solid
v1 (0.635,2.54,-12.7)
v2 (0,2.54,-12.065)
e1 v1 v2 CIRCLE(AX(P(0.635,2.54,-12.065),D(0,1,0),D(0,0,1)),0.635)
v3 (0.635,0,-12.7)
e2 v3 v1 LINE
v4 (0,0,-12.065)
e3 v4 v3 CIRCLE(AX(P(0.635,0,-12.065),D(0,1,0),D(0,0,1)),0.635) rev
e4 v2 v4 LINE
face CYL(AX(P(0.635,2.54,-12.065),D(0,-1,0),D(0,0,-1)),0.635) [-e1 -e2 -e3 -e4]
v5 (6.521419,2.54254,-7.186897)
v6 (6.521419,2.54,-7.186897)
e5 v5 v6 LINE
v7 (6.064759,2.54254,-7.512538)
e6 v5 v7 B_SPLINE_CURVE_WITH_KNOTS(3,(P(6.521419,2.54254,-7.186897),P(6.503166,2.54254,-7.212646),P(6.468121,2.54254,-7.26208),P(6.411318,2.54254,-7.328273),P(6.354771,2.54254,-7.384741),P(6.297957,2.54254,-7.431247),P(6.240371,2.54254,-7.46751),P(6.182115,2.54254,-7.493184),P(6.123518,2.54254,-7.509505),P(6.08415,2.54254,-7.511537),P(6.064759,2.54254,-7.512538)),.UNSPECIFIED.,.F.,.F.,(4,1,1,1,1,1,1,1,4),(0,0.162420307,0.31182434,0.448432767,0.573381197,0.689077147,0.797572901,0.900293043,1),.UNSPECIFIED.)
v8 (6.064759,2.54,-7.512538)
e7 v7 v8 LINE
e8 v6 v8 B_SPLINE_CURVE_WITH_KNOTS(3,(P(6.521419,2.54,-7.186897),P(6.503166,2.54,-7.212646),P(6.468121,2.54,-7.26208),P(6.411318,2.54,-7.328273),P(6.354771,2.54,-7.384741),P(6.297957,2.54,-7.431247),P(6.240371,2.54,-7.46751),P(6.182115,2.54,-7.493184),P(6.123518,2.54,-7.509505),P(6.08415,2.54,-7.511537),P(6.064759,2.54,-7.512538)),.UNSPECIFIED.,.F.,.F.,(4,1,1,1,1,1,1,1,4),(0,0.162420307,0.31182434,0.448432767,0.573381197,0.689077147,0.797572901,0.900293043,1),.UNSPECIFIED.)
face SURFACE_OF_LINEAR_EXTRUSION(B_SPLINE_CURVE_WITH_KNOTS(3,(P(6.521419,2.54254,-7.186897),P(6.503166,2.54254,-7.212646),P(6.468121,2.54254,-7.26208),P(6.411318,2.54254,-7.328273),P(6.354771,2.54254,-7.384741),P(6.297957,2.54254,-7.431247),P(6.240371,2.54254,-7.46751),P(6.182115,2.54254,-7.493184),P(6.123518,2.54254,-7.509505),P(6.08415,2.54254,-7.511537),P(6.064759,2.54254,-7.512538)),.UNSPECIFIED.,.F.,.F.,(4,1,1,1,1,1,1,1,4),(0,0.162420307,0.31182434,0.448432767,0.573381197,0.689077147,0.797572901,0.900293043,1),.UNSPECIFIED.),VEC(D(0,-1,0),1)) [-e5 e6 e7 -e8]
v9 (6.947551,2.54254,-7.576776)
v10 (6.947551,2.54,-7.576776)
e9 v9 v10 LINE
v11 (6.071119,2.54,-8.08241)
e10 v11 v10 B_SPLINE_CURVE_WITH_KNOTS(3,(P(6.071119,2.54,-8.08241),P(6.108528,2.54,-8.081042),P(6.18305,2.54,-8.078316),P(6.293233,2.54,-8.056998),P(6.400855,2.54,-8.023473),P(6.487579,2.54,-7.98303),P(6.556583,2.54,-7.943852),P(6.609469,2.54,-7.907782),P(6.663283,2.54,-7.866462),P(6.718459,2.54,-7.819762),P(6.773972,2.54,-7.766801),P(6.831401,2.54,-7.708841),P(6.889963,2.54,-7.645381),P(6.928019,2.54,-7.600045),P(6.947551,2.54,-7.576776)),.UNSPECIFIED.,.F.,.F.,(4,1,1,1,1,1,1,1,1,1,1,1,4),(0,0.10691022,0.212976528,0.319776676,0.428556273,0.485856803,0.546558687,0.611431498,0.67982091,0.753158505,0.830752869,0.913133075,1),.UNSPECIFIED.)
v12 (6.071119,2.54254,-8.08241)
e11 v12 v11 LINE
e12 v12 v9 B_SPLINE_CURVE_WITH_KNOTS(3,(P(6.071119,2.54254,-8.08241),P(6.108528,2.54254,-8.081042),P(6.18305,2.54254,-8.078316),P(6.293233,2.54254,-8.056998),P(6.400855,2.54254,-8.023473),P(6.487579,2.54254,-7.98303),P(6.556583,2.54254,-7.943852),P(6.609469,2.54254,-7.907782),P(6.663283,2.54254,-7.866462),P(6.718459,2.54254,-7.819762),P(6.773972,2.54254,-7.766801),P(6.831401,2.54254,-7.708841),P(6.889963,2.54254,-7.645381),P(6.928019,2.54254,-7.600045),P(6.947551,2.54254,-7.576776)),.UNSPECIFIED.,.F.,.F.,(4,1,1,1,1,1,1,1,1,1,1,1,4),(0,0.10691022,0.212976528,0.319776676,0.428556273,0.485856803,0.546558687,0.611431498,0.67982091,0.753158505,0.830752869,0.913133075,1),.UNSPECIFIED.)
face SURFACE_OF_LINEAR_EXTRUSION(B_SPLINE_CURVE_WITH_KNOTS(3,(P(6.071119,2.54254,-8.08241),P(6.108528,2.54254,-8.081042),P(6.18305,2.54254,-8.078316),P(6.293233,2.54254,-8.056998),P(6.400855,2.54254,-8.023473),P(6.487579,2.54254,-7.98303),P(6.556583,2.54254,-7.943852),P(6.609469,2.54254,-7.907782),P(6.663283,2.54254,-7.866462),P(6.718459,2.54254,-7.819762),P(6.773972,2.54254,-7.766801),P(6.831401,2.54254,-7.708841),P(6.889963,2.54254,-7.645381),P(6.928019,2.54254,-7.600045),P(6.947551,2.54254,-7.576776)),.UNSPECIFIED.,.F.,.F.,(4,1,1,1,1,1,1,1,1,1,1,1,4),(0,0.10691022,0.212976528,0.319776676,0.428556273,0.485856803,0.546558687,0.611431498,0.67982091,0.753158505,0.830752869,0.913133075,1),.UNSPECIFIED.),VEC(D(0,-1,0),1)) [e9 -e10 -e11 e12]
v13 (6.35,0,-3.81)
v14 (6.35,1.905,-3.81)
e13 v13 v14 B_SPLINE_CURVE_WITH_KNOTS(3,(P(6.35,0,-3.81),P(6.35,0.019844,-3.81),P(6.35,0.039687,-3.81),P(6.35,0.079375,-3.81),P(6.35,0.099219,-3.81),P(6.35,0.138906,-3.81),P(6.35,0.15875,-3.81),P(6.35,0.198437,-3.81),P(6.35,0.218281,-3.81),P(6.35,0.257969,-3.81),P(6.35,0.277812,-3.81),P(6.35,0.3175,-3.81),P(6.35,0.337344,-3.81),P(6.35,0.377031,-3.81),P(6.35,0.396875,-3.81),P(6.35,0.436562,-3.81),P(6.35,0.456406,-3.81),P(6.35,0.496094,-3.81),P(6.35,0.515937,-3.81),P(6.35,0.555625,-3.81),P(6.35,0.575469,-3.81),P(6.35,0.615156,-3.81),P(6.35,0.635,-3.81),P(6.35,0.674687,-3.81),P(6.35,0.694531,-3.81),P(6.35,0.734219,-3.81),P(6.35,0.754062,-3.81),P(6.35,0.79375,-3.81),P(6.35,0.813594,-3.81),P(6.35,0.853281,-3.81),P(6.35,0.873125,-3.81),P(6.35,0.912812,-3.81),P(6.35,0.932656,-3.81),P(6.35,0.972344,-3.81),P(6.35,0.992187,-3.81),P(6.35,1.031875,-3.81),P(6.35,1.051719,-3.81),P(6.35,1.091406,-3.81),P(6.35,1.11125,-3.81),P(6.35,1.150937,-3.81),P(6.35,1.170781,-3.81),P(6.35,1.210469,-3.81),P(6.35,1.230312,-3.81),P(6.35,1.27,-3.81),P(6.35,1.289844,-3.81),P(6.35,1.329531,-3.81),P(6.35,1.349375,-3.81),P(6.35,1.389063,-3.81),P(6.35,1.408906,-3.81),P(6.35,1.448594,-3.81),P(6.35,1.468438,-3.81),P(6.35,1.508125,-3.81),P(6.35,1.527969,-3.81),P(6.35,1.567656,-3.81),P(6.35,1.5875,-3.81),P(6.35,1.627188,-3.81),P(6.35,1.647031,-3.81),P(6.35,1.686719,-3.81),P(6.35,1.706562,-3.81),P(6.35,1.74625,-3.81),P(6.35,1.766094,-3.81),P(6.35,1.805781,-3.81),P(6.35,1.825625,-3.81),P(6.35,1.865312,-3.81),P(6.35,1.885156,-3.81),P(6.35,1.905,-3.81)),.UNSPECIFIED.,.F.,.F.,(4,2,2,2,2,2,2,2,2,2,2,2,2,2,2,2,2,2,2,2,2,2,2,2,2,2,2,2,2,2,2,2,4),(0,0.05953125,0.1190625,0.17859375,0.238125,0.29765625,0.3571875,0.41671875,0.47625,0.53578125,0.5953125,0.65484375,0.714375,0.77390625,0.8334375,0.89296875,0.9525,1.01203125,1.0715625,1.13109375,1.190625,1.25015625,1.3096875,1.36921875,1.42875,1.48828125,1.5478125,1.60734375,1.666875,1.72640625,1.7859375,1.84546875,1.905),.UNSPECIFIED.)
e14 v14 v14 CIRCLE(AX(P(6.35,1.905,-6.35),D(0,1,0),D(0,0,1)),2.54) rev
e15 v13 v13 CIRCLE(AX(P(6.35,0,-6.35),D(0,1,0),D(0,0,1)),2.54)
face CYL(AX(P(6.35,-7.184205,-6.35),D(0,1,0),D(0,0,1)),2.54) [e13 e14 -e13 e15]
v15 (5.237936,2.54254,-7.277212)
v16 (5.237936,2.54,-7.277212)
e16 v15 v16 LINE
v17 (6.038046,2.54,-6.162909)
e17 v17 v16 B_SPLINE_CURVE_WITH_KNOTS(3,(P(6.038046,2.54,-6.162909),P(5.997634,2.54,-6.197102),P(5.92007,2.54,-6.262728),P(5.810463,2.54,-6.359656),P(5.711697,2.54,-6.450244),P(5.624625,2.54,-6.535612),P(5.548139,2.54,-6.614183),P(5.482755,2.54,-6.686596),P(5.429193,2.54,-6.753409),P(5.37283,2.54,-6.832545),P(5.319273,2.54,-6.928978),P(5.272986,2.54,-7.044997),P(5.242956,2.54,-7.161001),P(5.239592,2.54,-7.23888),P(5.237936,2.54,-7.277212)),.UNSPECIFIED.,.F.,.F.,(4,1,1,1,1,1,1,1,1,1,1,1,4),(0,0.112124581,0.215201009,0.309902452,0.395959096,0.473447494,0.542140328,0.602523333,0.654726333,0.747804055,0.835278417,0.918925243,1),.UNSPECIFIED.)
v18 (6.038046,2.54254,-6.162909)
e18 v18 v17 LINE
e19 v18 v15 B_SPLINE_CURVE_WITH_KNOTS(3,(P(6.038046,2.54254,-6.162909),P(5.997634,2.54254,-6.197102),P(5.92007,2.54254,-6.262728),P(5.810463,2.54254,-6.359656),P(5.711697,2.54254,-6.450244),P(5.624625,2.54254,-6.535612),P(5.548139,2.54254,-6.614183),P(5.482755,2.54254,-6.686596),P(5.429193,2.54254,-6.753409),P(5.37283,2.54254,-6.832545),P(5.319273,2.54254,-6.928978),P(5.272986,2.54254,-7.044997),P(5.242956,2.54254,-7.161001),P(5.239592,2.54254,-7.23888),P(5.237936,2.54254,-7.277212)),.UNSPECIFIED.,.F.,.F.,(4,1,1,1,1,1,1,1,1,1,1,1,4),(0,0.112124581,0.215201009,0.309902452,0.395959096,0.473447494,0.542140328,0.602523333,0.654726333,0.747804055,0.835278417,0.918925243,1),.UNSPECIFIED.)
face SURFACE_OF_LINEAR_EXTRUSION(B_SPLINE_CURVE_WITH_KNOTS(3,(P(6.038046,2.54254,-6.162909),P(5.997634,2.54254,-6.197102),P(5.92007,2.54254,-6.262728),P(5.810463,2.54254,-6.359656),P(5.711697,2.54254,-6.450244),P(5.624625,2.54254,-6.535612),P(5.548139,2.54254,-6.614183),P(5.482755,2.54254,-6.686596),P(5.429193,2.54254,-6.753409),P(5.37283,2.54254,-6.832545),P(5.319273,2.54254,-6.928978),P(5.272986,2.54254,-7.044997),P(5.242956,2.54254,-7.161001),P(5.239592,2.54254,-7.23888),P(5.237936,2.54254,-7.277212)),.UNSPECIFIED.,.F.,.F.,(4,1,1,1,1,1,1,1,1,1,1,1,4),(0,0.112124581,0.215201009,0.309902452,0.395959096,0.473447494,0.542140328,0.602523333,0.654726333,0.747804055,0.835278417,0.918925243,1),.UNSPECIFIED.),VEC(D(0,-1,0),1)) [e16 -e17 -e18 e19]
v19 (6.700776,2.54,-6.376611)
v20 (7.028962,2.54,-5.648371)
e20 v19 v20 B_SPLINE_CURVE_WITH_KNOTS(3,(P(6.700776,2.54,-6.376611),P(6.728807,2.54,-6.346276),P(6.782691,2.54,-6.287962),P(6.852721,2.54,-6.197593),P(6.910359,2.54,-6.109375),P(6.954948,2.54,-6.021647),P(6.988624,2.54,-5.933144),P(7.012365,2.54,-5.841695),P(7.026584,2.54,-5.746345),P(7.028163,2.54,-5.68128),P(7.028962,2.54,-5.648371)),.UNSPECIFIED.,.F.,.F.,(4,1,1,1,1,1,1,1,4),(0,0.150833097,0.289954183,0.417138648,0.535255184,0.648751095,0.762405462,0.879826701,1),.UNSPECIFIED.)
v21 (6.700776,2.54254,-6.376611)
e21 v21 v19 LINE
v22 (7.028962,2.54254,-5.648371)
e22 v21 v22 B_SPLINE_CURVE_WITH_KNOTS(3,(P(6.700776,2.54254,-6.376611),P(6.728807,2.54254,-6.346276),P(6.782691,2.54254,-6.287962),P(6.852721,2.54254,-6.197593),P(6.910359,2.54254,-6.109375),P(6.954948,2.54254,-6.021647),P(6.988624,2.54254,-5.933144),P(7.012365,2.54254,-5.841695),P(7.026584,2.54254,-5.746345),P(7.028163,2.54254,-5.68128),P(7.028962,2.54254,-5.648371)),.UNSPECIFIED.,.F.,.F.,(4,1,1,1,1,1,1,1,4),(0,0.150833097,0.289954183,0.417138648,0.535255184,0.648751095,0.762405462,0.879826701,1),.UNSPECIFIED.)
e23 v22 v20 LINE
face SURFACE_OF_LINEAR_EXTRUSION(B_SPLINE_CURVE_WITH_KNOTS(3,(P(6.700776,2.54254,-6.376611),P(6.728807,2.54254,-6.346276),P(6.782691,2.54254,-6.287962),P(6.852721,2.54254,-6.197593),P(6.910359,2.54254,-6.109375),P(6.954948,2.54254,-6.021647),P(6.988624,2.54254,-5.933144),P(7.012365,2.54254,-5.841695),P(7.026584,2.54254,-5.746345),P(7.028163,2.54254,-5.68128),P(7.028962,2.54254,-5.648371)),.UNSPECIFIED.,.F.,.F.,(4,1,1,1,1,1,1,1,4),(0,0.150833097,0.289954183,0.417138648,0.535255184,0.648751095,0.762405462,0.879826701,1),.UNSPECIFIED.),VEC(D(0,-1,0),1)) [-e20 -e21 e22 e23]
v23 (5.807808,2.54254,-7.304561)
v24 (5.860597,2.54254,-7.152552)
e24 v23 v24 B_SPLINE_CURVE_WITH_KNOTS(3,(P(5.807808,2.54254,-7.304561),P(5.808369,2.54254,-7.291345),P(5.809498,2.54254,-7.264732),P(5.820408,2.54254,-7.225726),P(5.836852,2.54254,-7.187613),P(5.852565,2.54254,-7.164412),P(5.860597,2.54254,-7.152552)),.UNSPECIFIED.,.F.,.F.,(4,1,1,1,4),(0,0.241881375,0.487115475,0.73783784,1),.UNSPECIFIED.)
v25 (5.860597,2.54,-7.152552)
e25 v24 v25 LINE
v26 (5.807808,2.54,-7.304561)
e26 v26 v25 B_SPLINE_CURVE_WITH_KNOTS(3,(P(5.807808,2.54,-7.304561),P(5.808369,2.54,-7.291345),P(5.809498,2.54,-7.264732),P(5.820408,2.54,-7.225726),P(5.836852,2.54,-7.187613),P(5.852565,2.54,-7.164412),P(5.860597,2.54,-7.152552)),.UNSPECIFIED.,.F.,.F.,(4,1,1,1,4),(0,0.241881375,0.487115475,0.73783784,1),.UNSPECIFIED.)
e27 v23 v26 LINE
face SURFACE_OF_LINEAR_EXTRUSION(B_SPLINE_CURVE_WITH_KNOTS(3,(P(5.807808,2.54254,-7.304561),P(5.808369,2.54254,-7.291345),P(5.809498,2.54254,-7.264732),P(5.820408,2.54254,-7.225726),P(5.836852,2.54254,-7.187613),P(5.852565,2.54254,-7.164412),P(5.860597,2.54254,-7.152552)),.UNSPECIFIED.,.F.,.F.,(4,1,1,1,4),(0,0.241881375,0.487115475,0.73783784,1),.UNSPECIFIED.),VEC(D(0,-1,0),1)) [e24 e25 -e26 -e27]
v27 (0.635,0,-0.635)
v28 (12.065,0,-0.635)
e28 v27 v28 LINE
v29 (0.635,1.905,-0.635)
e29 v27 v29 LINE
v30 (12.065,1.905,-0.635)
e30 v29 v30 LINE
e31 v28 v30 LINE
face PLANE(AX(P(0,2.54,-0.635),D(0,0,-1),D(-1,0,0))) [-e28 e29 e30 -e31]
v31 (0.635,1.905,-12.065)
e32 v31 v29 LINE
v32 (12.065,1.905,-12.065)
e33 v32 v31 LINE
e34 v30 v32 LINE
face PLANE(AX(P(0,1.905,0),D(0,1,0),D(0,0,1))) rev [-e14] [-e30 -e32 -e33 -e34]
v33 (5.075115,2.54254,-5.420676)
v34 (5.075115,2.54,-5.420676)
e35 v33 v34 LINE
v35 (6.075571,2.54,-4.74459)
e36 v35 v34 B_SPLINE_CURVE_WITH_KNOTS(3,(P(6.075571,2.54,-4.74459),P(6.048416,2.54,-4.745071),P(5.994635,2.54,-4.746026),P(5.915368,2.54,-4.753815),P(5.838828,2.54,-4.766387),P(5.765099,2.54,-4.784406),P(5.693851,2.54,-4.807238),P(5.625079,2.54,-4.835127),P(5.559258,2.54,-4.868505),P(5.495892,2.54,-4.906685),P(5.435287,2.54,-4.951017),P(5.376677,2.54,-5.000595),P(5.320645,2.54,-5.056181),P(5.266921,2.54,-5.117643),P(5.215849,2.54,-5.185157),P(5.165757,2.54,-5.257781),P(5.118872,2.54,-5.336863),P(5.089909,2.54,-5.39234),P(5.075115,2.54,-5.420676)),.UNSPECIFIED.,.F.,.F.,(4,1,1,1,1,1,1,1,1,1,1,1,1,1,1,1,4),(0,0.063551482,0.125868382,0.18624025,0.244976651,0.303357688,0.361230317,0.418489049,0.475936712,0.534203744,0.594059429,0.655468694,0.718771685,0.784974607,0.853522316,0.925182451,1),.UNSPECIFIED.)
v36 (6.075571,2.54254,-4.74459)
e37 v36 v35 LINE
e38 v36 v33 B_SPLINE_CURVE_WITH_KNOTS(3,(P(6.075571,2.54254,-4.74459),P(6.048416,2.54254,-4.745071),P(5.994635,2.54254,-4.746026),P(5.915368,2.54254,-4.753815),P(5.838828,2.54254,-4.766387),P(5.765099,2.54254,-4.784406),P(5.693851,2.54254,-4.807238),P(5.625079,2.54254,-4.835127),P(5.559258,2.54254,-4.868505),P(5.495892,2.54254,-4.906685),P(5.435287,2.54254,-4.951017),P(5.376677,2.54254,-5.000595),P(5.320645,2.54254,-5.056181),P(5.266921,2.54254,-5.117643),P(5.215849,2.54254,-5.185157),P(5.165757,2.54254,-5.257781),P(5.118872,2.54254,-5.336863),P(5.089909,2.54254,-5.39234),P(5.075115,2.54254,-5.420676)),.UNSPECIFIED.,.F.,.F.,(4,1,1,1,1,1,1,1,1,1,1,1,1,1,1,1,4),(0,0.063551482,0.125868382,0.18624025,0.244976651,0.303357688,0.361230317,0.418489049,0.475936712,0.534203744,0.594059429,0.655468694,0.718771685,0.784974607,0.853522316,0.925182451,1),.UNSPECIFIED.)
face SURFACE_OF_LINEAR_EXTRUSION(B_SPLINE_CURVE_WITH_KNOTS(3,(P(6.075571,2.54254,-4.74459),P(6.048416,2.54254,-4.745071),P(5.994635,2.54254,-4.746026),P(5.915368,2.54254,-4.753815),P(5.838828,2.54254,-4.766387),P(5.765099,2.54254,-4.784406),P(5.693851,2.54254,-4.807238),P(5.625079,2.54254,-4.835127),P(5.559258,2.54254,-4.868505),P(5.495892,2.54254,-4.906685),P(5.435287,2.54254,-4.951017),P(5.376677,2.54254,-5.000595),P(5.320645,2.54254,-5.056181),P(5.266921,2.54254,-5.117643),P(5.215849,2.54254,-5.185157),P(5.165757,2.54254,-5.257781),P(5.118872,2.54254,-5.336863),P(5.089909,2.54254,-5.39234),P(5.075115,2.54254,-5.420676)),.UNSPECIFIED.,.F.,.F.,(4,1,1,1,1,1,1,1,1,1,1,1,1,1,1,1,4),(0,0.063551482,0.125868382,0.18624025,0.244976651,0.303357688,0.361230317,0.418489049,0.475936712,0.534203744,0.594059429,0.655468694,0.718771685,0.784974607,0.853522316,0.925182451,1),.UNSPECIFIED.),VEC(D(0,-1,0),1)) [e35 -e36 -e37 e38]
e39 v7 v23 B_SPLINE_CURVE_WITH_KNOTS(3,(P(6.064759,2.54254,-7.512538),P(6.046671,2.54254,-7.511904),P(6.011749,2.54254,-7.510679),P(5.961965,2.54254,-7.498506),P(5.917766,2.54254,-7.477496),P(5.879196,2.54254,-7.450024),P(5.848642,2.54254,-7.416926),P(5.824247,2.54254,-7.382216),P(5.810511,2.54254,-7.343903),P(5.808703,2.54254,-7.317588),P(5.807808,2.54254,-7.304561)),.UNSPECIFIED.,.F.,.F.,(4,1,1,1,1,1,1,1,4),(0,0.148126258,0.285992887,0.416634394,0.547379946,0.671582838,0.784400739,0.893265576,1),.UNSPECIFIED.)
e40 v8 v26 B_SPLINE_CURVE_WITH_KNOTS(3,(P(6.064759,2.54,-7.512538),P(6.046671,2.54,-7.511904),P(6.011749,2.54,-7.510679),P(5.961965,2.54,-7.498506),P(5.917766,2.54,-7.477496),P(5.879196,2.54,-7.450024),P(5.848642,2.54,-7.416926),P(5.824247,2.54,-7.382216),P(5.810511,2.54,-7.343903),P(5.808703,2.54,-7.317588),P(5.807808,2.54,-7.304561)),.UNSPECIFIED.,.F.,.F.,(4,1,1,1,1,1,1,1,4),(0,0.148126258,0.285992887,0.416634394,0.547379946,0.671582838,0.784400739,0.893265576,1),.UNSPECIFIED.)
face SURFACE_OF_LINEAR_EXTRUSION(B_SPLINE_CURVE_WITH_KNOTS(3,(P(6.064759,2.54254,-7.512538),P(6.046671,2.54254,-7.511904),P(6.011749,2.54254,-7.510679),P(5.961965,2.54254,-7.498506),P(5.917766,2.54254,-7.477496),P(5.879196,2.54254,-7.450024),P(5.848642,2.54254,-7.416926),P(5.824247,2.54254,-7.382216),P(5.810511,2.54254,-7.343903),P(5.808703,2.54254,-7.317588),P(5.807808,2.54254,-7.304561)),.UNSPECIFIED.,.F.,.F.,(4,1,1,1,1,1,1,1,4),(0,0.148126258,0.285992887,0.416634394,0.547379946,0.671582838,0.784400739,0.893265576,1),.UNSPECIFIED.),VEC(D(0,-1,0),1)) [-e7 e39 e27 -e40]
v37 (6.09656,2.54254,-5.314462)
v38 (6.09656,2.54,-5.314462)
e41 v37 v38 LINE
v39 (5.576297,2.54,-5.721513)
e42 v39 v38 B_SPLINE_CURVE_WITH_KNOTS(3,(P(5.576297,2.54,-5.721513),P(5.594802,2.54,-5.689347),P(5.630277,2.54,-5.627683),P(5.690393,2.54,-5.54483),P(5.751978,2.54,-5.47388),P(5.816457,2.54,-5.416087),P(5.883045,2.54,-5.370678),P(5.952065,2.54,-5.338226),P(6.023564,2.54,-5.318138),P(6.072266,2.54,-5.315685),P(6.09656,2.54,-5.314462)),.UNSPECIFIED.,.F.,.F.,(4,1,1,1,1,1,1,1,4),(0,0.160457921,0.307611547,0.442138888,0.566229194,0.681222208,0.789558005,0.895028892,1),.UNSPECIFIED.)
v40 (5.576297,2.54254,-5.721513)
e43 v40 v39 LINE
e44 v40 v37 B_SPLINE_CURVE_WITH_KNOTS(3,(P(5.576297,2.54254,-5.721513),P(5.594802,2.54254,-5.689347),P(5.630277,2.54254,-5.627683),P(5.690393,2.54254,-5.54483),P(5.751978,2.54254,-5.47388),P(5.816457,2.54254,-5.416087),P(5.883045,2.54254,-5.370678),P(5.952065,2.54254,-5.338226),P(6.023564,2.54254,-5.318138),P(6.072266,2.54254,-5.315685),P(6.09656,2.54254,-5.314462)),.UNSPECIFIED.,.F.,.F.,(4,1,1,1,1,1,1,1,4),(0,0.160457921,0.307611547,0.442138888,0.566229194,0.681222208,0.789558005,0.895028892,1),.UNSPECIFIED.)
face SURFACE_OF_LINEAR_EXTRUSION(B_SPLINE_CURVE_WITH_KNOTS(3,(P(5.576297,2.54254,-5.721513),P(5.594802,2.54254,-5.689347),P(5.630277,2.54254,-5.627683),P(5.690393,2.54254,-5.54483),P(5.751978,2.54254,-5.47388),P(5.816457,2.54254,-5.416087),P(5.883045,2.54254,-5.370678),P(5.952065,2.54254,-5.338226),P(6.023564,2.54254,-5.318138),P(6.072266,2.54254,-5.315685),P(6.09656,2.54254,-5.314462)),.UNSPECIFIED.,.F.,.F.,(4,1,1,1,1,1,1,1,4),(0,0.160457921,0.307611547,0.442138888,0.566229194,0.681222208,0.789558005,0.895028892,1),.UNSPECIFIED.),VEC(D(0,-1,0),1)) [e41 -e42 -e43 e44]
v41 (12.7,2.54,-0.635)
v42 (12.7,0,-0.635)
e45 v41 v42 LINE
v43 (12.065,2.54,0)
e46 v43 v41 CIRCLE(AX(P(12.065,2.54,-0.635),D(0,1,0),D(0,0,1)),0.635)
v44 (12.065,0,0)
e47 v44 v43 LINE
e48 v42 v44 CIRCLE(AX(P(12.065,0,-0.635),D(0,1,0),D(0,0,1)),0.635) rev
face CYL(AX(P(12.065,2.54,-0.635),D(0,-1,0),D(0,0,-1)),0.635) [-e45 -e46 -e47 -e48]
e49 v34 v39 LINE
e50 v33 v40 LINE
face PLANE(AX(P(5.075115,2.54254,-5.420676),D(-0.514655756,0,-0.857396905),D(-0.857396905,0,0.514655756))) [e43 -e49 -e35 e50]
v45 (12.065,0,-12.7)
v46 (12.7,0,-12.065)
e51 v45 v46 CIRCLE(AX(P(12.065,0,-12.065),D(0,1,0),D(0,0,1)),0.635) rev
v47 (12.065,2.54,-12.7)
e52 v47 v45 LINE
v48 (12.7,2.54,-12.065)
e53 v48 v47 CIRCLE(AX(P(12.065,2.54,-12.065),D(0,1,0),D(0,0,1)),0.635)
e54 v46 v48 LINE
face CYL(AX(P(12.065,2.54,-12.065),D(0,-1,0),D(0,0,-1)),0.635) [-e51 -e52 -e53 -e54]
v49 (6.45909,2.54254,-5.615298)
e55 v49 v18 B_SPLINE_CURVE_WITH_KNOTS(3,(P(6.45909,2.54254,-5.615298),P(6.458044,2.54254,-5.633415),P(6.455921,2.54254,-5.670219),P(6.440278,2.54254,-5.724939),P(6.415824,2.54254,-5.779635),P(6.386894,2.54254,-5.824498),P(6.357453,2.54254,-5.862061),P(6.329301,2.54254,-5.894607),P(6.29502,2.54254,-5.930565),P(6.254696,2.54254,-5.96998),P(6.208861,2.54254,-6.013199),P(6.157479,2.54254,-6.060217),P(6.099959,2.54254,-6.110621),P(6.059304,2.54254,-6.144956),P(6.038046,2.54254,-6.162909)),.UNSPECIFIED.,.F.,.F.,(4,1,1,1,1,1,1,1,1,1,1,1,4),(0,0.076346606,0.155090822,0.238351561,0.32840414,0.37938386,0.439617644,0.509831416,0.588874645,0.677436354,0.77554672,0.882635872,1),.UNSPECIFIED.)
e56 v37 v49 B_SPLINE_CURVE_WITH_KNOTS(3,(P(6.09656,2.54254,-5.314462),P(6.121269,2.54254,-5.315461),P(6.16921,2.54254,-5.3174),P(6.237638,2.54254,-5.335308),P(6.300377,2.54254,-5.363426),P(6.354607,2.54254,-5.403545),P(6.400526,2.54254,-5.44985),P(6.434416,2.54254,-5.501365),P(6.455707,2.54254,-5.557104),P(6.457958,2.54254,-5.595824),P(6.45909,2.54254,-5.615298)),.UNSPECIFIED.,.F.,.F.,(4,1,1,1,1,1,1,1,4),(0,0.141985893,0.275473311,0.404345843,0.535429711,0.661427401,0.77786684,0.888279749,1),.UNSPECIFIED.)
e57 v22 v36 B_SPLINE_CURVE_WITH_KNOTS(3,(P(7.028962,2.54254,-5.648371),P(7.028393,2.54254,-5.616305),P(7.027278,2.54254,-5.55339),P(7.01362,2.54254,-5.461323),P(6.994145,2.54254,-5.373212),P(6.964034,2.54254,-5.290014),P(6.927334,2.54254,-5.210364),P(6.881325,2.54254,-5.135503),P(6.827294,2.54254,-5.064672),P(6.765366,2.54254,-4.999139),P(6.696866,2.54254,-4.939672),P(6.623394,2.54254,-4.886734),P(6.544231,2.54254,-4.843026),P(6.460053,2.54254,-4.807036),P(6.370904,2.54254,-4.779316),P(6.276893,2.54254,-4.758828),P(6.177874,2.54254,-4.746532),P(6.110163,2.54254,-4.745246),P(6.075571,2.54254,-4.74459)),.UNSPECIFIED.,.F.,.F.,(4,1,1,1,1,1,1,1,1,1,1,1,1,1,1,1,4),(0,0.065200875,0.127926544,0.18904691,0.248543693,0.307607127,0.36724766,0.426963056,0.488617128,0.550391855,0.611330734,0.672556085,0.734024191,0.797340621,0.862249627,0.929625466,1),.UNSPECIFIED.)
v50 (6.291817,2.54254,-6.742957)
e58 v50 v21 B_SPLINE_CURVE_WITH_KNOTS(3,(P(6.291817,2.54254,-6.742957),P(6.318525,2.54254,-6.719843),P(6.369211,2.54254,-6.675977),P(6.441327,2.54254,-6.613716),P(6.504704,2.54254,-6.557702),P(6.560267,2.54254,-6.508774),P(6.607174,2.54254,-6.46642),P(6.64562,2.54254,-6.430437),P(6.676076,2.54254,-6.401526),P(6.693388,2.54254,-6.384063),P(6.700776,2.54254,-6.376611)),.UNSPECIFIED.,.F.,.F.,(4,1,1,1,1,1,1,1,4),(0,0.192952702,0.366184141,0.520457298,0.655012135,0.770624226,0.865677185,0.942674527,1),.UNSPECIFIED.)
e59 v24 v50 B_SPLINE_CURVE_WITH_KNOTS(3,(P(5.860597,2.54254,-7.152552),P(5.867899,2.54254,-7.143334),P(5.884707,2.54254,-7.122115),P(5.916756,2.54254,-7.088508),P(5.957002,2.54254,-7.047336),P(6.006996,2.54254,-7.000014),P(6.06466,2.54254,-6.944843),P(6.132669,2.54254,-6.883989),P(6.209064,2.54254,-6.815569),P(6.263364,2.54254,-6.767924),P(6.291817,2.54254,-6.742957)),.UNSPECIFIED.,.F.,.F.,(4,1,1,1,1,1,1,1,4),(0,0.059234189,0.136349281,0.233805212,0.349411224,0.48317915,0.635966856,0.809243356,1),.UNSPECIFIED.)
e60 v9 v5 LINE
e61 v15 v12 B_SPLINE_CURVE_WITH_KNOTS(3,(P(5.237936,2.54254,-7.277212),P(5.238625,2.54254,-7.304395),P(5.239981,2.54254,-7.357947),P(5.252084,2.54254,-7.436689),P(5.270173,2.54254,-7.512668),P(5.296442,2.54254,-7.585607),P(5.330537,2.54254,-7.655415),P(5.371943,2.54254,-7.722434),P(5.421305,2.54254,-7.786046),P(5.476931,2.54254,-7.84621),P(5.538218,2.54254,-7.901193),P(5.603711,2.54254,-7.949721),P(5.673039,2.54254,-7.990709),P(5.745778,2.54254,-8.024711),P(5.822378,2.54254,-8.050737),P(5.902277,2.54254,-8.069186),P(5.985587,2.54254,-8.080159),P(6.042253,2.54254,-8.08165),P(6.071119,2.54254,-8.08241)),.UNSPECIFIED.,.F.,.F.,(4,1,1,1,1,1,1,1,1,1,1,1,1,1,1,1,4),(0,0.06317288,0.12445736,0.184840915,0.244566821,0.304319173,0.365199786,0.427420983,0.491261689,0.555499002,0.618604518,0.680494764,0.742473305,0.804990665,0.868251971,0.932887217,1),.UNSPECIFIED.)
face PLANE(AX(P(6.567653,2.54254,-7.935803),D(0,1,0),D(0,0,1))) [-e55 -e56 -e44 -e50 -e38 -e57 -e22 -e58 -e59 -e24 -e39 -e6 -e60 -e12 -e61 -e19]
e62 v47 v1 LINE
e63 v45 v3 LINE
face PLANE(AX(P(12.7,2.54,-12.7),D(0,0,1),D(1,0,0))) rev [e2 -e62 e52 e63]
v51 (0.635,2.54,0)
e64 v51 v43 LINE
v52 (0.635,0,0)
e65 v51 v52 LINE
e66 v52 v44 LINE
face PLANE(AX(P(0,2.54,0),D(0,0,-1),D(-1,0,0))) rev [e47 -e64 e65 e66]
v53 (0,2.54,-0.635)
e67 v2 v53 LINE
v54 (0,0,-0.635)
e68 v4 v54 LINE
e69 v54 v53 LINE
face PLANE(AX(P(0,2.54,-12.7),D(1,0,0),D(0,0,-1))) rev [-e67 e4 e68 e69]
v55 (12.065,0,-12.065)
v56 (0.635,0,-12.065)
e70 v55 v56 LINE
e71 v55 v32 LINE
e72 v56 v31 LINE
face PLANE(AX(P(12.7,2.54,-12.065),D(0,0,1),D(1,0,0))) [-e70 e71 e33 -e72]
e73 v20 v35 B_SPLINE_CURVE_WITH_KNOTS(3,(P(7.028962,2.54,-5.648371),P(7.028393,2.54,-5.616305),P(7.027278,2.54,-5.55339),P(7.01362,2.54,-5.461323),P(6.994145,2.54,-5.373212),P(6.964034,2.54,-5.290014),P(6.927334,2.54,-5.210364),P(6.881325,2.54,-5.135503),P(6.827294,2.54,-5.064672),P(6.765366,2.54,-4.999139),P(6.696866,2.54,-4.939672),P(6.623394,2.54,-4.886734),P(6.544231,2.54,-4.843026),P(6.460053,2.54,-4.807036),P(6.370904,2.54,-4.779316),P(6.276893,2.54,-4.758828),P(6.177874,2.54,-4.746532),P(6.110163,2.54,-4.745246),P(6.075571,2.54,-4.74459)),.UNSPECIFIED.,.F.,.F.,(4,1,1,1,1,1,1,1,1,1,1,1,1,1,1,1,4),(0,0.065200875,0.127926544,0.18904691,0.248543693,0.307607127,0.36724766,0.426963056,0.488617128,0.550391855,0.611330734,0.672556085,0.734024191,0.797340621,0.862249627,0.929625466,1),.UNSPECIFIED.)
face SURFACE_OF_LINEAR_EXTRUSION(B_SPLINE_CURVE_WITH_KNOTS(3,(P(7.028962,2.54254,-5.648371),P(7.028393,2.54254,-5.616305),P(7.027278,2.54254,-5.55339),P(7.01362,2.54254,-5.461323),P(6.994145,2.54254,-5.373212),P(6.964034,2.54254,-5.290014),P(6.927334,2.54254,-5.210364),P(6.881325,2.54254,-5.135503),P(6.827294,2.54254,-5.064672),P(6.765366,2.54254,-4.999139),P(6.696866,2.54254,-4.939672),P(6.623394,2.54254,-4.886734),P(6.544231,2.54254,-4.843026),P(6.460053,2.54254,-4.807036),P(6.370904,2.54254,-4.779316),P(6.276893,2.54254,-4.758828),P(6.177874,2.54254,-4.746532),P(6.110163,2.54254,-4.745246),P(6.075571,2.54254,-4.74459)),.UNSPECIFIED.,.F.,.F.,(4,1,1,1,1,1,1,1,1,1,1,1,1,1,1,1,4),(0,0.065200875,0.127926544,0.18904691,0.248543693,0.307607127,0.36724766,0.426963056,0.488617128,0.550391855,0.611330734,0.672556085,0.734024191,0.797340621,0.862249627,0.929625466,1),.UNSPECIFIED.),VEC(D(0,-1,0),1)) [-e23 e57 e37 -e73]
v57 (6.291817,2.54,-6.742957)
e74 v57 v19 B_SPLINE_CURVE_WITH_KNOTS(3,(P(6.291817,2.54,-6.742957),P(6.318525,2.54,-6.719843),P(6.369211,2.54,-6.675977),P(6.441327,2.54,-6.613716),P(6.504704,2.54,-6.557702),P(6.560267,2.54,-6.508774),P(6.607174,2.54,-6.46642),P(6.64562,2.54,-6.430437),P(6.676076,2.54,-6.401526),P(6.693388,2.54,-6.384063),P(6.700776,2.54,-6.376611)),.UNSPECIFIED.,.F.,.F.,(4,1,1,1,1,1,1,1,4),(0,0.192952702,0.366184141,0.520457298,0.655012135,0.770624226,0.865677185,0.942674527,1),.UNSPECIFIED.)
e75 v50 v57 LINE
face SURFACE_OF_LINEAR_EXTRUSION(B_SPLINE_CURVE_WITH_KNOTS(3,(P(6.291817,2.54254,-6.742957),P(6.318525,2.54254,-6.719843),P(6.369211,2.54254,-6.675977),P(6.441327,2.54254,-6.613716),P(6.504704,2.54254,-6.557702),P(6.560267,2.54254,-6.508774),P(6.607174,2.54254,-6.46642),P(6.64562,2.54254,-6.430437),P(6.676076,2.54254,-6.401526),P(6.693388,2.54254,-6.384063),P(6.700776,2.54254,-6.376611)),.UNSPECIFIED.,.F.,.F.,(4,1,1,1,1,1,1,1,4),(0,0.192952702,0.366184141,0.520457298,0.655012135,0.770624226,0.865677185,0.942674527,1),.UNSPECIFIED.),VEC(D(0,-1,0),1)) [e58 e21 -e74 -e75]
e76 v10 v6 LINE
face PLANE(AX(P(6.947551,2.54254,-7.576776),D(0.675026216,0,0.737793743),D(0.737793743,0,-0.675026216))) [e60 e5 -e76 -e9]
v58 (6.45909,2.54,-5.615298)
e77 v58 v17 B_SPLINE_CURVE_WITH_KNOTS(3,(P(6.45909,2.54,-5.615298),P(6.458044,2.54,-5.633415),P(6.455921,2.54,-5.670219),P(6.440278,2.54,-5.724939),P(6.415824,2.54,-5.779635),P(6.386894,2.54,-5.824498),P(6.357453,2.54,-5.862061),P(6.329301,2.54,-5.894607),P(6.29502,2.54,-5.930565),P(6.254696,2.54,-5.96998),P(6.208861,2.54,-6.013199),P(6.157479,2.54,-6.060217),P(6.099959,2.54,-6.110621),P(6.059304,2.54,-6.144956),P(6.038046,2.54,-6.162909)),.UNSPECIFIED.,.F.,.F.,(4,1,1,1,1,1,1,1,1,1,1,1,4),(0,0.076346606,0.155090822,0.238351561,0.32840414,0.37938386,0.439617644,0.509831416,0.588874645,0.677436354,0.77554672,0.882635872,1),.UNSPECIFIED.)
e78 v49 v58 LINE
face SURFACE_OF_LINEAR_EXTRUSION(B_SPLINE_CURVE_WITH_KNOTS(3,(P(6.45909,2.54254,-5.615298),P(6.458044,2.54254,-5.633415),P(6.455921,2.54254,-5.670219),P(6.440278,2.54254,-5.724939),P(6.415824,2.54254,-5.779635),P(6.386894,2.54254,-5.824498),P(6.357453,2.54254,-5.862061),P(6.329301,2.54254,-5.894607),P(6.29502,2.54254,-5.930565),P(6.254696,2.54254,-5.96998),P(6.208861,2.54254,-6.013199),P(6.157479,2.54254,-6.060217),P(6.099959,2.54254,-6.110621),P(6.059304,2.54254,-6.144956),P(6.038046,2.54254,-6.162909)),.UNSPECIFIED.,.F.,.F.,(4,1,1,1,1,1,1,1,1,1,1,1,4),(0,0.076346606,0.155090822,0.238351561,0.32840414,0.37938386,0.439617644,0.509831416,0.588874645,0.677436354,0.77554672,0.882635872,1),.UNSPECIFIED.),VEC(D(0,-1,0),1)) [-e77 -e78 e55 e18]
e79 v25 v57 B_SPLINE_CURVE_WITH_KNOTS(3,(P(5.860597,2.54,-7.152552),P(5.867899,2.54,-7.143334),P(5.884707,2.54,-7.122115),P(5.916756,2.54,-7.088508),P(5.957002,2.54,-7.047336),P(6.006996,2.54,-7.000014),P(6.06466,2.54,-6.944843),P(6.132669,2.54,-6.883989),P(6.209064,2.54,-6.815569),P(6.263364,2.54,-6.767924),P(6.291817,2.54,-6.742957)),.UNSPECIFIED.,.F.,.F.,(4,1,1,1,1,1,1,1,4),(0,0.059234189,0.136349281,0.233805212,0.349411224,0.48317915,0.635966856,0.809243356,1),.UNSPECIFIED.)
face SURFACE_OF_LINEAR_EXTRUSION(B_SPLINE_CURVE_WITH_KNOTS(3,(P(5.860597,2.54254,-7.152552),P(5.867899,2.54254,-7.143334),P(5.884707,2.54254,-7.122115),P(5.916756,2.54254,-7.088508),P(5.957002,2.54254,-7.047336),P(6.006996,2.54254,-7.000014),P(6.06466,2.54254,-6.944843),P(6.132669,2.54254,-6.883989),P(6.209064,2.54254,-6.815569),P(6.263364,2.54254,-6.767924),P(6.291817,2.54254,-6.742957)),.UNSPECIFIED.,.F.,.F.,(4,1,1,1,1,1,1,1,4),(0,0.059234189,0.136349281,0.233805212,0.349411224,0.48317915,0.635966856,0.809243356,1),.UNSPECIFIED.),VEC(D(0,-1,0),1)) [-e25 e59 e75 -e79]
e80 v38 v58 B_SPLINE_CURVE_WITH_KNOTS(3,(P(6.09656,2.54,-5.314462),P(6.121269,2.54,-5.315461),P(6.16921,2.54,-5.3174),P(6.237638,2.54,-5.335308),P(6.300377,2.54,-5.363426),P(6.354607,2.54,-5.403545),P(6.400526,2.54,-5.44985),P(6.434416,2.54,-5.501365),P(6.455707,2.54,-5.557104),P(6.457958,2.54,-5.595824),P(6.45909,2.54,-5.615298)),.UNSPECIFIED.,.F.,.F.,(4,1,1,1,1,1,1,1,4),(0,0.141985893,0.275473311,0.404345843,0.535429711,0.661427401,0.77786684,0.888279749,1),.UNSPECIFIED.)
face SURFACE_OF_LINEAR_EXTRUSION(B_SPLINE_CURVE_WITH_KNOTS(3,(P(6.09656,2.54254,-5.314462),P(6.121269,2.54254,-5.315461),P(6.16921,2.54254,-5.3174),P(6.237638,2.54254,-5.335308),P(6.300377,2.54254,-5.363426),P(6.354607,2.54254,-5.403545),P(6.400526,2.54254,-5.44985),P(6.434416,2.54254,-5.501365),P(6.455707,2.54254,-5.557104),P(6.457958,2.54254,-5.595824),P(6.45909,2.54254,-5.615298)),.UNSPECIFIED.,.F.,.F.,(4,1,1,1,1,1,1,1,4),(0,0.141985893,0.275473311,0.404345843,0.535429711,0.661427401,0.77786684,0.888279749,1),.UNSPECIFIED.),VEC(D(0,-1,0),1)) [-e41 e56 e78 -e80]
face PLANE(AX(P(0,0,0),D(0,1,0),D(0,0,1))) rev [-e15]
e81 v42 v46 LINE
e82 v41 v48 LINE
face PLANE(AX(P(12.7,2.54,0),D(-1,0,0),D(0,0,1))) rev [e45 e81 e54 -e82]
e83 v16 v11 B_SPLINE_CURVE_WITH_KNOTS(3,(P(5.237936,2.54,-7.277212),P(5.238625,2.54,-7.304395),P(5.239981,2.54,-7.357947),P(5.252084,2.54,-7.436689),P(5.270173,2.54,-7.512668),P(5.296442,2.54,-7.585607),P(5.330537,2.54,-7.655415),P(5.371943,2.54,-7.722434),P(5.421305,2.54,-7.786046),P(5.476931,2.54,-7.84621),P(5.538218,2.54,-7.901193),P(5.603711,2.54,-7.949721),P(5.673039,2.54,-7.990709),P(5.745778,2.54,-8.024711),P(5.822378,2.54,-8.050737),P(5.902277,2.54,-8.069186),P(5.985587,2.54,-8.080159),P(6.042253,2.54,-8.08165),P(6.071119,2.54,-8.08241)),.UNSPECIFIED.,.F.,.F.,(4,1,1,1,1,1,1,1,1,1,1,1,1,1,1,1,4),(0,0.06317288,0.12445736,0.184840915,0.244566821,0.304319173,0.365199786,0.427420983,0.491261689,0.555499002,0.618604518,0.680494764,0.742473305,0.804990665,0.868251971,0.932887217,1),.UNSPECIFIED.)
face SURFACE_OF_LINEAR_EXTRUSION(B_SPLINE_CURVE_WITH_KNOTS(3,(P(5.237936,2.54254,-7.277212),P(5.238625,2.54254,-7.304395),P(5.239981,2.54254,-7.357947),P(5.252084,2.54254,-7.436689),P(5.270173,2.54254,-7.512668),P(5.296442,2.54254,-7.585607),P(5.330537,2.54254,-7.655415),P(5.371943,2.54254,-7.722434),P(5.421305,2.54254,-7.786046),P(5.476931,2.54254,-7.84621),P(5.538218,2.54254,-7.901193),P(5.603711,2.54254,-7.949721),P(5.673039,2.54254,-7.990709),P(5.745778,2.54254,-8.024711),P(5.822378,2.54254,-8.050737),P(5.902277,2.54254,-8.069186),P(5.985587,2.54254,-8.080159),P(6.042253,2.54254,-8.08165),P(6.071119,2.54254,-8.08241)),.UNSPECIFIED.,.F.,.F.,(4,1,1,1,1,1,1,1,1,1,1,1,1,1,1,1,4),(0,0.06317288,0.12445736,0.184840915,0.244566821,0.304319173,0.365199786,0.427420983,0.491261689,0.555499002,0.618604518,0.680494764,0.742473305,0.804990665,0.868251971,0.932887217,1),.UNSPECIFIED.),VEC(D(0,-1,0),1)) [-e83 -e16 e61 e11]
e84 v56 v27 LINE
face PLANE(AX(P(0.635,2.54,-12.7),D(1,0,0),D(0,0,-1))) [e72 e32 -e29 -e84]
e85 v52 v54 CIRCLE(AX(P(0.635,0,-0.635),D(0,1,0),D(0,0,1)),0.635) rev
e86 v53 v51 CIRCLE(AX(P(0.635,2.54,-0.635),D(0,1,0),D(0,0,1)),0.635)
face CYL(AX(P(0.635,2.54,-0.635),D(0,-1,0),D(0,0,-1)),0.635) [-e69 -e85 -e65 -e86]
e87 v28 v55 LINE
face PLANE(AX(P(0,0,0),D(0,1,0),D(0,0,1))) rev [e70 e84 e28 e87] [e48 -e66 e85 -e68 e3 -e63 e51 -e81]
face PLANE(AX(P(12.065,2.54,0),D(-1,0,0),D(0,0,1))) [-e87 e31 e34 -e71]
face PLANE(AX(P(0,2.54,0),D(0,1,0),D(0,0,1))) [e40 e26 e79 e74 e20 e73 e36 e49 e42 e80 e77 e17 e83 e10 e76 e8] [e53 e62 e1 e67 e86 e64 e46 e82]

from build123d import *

# Parameters (mm, degrees)
SKETCH1_W           = 12.7
SKETCH1_H           = 12.7
BOSS_EXTRUDE1_DEPTH = 2.54
FILLET1_R           = 0.635
SHELL1_START        = 0.635
SHELL1_OUTLINE_W    = 1.905
SHELL1_OUTLINE_H    = 11.43
SHELL1_DEPTH        = 11.43
SKETCH2_R           = 2.54
BOSS_EXTRUDE2_DEPTH = 1.905
BOSS_EXTRUDE3_DEPTH = 0.00254


# Read off the part's stored shape, not the designer's step: Shell1
with BuildPart() as part:
    # Sketch1 → Boss-Extrude1 (new body)
    with BuildSketch(Plane(origin=(0, 0, 0), x_dir=(1, 0, 0), z_dir=(0, 1, 0))):
        with Locations((6.35, 6.35)):
            Rectangle(SKETCH1_W, SKETCH1_H)
    extrude(amount=BOSS_EXTRUDE1_DEPTH)

    # Fillet1
    fillet1_edges = [part.edges().sort_by_distance(p)[0] for p in [
        (0, 1.27, -12.7),
        (12.7, 1.27, -12.7),
        (12.7, 1.27, 0),
        (0, 1.27, 0),
    ]]
    fillet(fillet1_edges, radius=FILLET1_R)

    # Shell1 outline → Shell1 (cut)
    with BuildSketch(Plane.YZ.offset(SHELL1_START)):
        with Locations((0.9525, -6.35)):
            Rectangle(SHELL1_OUTLINE_W, SHELL1_OUTLINE_H)
    extrude(amount=SHELL1_DEPTH, mode=Mode.SUBTRACT)

    # Sketch2 → Boss-Extrude2 (add)
    with BuildSketch(Plane(origin=(0, 1.905, 0), x_dir=(-1, 0, 0), z_dir=(0, -1, 0))):
        with Locations(Location((-6.35, 6.35, 0), (0, 0, 270))):
            Circle(SKETCH2_R)
    extrude(amount=BOSS_EXTRUDE2_DEPTH)

    # Sketch3 → Boss-Extrude3 (add)
    with BuildSketch(Plane(origin=(0, 2.54, 0), x_dir=(1, 0, 0), z_dir=(0, 1, 0))):
        with BuildLine():
            Line((6.947551282, 7.576776242), (6.521419471, 7.186897436))
            add(Edge.make_bspline(
                [(6.521419471, 7.186897436), (6.503165812, 7.21264612), (6.468121331, 7.262080004), (6.411317883, 7.328273139), (6.354770931, 7.384740809), (6.297956603, 7.431247119), (6.240371318, 7.467509507), (6.182115036, 7.493183679), (6.123518028, 7.509504993), (6.084149883, 7.51153739), (6.064758814, 7.512538462)],
                knots=[0, 0, 0, 0, 1.299362458, 2.494594718, 3.587462134, 4.587049575, 5.512617175, 6.380583204, 7.202344345, 8, 8, 8, 8], degree=3))
            add(Edge.make_bspline(
                [(6.064758814, 7.512538462), (6.046671381, 7.511904137), (6.0117493, 7.510679422), (5.961965283, 7.498505847), (5.917766323, 7.477496044), (5.879195557, 7.45002396), (5.84864182, 7.416926467), (5.82424703, 7.382215707), (5.810510714, 7.343902879), (5.808702744, 7.317588082), (5.807807692, 7.304560697)],
                knots=[0, 0, 0, 0, 1.185010067, 2.2879431, 3.333075148, 4.379039566, 5.372662701, 6.27520591, 7.14612461, 8, 8, 8, 8], degree=3))
            add(Edge.make_bspline(
                [(5.807807692, 7.304560697), (5.808368576, 7.291345451), (5.809498118, 7.264731783), (5.820407957, 7.225726137), (5.836852199, 7.18761308), (5.852565344, 7.164411849), (5.860597155, 7.152552484)],
                knots=[0, 0, 0, 0, 0.967525499, 1.948461899, 2.951351359, 4, 4, 4, 4], degree=3))
            add(Edge.make_bspline(
                [(5.860597155, 7.152552484), (5.867898941, 7.143334324), (5.884706688, 7.122115336), (5.916755618, 7.088507766), (5.957002343, 7.047335552), (6.006995642, 7.000014485), (6.064660156, 6.944842714), (6.132668709, 6.883989063), (6.209063719, 6.815568965), (6.263363522, 6.767923686), (6.291817107, 6.742957131)],
                knots=[0, 0, 0, 0, 0.473873513, 1.090794244, 1.870441696, 2.795289791, 3.865433203, 5.087734844, 6.473946851, 8, 8, 8, 8], degree=3))
            add(Edge.make_bspline(
                [(6.291817107, 6.742957131), (6.31852489, 6.719842892), (6.369210714, 6.675976869), (6.441326575, 6.613716092), (6.504704406, 6.557701589), (6.560267478, 6.508774018), (6.607173508, 6.466420016), (6.645619689, 6.430437133), (6.676075577, 6.401525888), (6.693387966, 6.384063478), (6.700776442, 6.376610978)],
                knots=[0, 0, 0, 0, 1.543621617, 2.929473131, 4.163658386, 5.240097082, 6.164993805, 6.925417477, 7.541396219, 8, 8, 8, 8], degree=3))
            add(Edge.make_bspline(
                [(6.700776442, 6.376610978), (6.72880678, 6.346276149), (6.782690932, 6.287961956), (6.852721334, 6.197593297), (6.910358621, 6.109375058), (6.954947919, 6.021647272), (6.98862355, 5.9331442), (7.012365316, 5.84169531), (7.026584417, 5.746345018), (7.02816307, 5.681280084), (7.028961538, 5.648370793)],
                knots=[0, 0, 0, 0, 1.206664779, 2.319633467, 3.337109185, 4.282041471, 5.190008762, 6.099243693, 7.03861361, 8, 8, 8, 8], degree=3))
            add(Edge.make_bspline(
                [(7.028961538, 5.648370793), (7.028393209, 5.616304725), (7.027278125, 5.553389906), (7.013620483, 5.46132344), (6.994145488, 5.373211837), (6.96403373, 5.290013874), (6.927333696, 5.210363884), (6.881324904, 5.135502559), (6.827293886, 5.064672272), (6.765366044, 4.999139201), (6.696866497, 4.939672482), (6.623394222, 4.886733804), (6.544230772, 4.843026182), (6.460052505, 4.807036073), (6.370904481, 4.77931601), (6.276892901, 4.7588283), (6.17787397, 4.746531899), (6.110163397, 4.745246456), (6.075571114, 4.744589744)],
                knots=[0, 0, 0, 0, 1.043214005, 2.046824704, 3.02475056, 3.976699089, 4.921714032, 5.875962561, 6.831408892, 7.817874052, 8.806269674, 9.781291748, 10.760897367, 11.74438705, 12.757449933, 13.795994037, 14.874007457, 16, 16, 16, 16], degree=3))
            add(Edge.make_bspline(
                [(6.075571114, 4.744589744), (6.048416466, 4.745071485), (5.994634689, 4.74602561), (5.915368481, 4.753815242), (5.838827997, 4.766386881), (5.765099453, 4.784405794), (5.693850688, 4.807238201), (5.625078777, 4.835127112), (5.559258474, 4.868504794), (5.495891752, 4.906684869), (5.435286652, 4.951016965), (5.376676846, 5.000594728), (5.320644503, 5.056180684), (5.266920509, 5.117643377), (5.215848607, 5.185156853), (5.165757029, 5.257780861), (5.118871997, 5.336863206), (5.089909027, 5.392340111), (5.075115385, 5.420676482)],
                knots=[0, 0, 0, 0, 1.016823716, 2.013894106, 2.979844003, 3.91962641, 4.853723003, 5.779685073, 6.695824784, 7.614987388, 8.547259901, 9.504950863, 10.487499108, 11.500346958, 12.559593716, 13.656357062, 14.802919212, 16, 16, 16, 16], degree=3))
            Line((5.075115385, 5.420676482), (5.576297276, 5.721512821))
            add(Edge.make_bspline(
                [(5.576297276, 5.721512821), (5.594801911, 5.689347337), (5.630276879, 5.627683355), (5.690392527, 5.54482998), (5.751977941, 5.473879779), (5.816456918, 5.416086802), (5.883045419, 5.370678281), (5.952065082, 5.338226202), (6.023564398, 5.318138402), (6.072266484, 5.315685218), (6.096559696, 5.314461538)],
                knots=[0, 0, 0, 0, 1.283663364, 2.460892379, 3.537111102, 4.529833553, 5.449777664, 6.316464042, 7.160231139, 8, 8, 8, 8], degree=3))
            add(Edge.make_bspline(
                [(6.096559696, 5.314461538), (6.12126937, 5.315460861), (6.169209736, 5.317399693), (6.237638475, 5.335308096), (6.300376534, 5.363425604), (6.354606849, 5.403545409), (6.40052566, 5.449849762), (6.434416378, 5.501365473), (6.455706756, 5.557104227), (6.457957665, 5.595824033), (6.459089744, 5.615297877)],
                knots=[0, 0, 0, 0, 1.13588714, 2.203786484, 3.234766741, 4.283437687, 5.291419208, 6.222934724, 7.106237994, 8, 8, 8, 8], degree=3))
            add(Edge.make_bspline(
                [(6.459089744, 5.615297877), (6.458044316, 5.633415119), (6.455920629, 5.670218563), (6.440278206, 5.724939365), (6.415824328, 5.779635282), (6.386893665, 5.824498352), (6.357453094, 5.862060985), (6.329301267, 5.894607307), (6.295019789, 5.930565296), (6.254695583, 5.969980182), (6.208861436, 6.013198947), (6.157478739, 6.060217356), (6.099959106, 6.110621236), (6.059304117, 6.14495586), (6.038046074, 6.162909054)],
                knots=[0, 0, 0, 0, 0.916159276, 1.861089862, 2.860218735, 3.940849679, 4.552606315, 5.27541173, 6.11797699, 7.06649574, 8.129236253, 9.306560635, 10.591630461, 12, 12, 12, 12], degree=3))
            add(Edge.make_bspline(
                [(6.038046074, 6.162909054), (5.997633688, 6.197101808), (5.920070088, 6.262728051), (5.810462881, 6.359655946), (5.711696974, 6.450243946), (5.624625414, 6.535611915), (5.548138776, 6.614183306), (5.482755059, 6.686596305), (5.429192535, 6.75340948), (5.372829528, 6.832545214), (5.319273403, 6.928977544), (5.272985712, 7.044996816), (5.242956212, 7.161001367), (5.239591824, 7.238880433), (5.237935897, 7.277211939)],
                knots=[0, 0, 0, 0, 1.345494975, 2.582412109, 3.71882943, 4.751509156, 5.681369928, 6.505683931, 7.230279997, 7.856715994, 8.973648664, 10.023341002, 11.027102913, 12, 12, 12, 12], degree=3))
            add(Edge.make_bspline(
                [(5.237935897, 7.277211939), (5.238624595, 7.304394586), (5.239981404, 7.35794732), (5.252084347, 7.436688812), (5.270172657, 7.512667736), (5.296442076, 7.585606886), (5.33053661, 7.655414903), (5.371943098, 7.722433526), (5.421304502, 7.786045931), (5.476931473, 7.846209948), (5.538218153, 7.901193012), (5.603710758, 7.949721076), (5.673038596, 7.990708584), (5.745777553, 8.024710699), (5.822378363, 8.050737157), (5.90227671, 8.069186008), (5.985587195, 8.080158796), (6.042253188, 8.08165042), (6.07111899, 8.082410256)],
                knots=[0, 0, 0, 0, 1.010766082, 1.991317756, 2.957454644, 3.913069143, 4.869106762, 5.843196583, 6.838735724, 7.860187025, 8.887984031, 9.89767229, 10.887916223, 11.879572884, 12.879850636, 13.892031539, 14.926195476, 16, 16, 16, 16], degree=3))
            add(Edge.make_bspline(
                [(6.07111899, 8.082410256), (6.108527641, 8.081041768), (6.183049652, 8.078315594), (6.293232593, 8.056997805), (6.400854684, 8.023473336), (6.487578582, 7.983029753), (6.556583169, 7.943852034), (6.609468739, 7.907782126), (6.663282653, 7.866462108), (6.718458887, 7.819761769), (6.773972181, 7.766801214), (6.831401043, 7.70884121), (6.889962936, 7.645380848), (6.92801888, 7.600045059), (6.947551282, 7.576776242)],
                knots=[0, 0, 0, 0, 1.282922637, 2.555718331, 3.837320111, 5.142675274, 5.830281639, 6.55870424, 7.337177975, 8.157850921, 9.037902056, 9.96903443, 10.957596896, 12, 12, 12, 12], degree=3))
        make_face()
    extrude(amount=BOSS_EXTRUDE3_DEPTH)


solid = part.part
